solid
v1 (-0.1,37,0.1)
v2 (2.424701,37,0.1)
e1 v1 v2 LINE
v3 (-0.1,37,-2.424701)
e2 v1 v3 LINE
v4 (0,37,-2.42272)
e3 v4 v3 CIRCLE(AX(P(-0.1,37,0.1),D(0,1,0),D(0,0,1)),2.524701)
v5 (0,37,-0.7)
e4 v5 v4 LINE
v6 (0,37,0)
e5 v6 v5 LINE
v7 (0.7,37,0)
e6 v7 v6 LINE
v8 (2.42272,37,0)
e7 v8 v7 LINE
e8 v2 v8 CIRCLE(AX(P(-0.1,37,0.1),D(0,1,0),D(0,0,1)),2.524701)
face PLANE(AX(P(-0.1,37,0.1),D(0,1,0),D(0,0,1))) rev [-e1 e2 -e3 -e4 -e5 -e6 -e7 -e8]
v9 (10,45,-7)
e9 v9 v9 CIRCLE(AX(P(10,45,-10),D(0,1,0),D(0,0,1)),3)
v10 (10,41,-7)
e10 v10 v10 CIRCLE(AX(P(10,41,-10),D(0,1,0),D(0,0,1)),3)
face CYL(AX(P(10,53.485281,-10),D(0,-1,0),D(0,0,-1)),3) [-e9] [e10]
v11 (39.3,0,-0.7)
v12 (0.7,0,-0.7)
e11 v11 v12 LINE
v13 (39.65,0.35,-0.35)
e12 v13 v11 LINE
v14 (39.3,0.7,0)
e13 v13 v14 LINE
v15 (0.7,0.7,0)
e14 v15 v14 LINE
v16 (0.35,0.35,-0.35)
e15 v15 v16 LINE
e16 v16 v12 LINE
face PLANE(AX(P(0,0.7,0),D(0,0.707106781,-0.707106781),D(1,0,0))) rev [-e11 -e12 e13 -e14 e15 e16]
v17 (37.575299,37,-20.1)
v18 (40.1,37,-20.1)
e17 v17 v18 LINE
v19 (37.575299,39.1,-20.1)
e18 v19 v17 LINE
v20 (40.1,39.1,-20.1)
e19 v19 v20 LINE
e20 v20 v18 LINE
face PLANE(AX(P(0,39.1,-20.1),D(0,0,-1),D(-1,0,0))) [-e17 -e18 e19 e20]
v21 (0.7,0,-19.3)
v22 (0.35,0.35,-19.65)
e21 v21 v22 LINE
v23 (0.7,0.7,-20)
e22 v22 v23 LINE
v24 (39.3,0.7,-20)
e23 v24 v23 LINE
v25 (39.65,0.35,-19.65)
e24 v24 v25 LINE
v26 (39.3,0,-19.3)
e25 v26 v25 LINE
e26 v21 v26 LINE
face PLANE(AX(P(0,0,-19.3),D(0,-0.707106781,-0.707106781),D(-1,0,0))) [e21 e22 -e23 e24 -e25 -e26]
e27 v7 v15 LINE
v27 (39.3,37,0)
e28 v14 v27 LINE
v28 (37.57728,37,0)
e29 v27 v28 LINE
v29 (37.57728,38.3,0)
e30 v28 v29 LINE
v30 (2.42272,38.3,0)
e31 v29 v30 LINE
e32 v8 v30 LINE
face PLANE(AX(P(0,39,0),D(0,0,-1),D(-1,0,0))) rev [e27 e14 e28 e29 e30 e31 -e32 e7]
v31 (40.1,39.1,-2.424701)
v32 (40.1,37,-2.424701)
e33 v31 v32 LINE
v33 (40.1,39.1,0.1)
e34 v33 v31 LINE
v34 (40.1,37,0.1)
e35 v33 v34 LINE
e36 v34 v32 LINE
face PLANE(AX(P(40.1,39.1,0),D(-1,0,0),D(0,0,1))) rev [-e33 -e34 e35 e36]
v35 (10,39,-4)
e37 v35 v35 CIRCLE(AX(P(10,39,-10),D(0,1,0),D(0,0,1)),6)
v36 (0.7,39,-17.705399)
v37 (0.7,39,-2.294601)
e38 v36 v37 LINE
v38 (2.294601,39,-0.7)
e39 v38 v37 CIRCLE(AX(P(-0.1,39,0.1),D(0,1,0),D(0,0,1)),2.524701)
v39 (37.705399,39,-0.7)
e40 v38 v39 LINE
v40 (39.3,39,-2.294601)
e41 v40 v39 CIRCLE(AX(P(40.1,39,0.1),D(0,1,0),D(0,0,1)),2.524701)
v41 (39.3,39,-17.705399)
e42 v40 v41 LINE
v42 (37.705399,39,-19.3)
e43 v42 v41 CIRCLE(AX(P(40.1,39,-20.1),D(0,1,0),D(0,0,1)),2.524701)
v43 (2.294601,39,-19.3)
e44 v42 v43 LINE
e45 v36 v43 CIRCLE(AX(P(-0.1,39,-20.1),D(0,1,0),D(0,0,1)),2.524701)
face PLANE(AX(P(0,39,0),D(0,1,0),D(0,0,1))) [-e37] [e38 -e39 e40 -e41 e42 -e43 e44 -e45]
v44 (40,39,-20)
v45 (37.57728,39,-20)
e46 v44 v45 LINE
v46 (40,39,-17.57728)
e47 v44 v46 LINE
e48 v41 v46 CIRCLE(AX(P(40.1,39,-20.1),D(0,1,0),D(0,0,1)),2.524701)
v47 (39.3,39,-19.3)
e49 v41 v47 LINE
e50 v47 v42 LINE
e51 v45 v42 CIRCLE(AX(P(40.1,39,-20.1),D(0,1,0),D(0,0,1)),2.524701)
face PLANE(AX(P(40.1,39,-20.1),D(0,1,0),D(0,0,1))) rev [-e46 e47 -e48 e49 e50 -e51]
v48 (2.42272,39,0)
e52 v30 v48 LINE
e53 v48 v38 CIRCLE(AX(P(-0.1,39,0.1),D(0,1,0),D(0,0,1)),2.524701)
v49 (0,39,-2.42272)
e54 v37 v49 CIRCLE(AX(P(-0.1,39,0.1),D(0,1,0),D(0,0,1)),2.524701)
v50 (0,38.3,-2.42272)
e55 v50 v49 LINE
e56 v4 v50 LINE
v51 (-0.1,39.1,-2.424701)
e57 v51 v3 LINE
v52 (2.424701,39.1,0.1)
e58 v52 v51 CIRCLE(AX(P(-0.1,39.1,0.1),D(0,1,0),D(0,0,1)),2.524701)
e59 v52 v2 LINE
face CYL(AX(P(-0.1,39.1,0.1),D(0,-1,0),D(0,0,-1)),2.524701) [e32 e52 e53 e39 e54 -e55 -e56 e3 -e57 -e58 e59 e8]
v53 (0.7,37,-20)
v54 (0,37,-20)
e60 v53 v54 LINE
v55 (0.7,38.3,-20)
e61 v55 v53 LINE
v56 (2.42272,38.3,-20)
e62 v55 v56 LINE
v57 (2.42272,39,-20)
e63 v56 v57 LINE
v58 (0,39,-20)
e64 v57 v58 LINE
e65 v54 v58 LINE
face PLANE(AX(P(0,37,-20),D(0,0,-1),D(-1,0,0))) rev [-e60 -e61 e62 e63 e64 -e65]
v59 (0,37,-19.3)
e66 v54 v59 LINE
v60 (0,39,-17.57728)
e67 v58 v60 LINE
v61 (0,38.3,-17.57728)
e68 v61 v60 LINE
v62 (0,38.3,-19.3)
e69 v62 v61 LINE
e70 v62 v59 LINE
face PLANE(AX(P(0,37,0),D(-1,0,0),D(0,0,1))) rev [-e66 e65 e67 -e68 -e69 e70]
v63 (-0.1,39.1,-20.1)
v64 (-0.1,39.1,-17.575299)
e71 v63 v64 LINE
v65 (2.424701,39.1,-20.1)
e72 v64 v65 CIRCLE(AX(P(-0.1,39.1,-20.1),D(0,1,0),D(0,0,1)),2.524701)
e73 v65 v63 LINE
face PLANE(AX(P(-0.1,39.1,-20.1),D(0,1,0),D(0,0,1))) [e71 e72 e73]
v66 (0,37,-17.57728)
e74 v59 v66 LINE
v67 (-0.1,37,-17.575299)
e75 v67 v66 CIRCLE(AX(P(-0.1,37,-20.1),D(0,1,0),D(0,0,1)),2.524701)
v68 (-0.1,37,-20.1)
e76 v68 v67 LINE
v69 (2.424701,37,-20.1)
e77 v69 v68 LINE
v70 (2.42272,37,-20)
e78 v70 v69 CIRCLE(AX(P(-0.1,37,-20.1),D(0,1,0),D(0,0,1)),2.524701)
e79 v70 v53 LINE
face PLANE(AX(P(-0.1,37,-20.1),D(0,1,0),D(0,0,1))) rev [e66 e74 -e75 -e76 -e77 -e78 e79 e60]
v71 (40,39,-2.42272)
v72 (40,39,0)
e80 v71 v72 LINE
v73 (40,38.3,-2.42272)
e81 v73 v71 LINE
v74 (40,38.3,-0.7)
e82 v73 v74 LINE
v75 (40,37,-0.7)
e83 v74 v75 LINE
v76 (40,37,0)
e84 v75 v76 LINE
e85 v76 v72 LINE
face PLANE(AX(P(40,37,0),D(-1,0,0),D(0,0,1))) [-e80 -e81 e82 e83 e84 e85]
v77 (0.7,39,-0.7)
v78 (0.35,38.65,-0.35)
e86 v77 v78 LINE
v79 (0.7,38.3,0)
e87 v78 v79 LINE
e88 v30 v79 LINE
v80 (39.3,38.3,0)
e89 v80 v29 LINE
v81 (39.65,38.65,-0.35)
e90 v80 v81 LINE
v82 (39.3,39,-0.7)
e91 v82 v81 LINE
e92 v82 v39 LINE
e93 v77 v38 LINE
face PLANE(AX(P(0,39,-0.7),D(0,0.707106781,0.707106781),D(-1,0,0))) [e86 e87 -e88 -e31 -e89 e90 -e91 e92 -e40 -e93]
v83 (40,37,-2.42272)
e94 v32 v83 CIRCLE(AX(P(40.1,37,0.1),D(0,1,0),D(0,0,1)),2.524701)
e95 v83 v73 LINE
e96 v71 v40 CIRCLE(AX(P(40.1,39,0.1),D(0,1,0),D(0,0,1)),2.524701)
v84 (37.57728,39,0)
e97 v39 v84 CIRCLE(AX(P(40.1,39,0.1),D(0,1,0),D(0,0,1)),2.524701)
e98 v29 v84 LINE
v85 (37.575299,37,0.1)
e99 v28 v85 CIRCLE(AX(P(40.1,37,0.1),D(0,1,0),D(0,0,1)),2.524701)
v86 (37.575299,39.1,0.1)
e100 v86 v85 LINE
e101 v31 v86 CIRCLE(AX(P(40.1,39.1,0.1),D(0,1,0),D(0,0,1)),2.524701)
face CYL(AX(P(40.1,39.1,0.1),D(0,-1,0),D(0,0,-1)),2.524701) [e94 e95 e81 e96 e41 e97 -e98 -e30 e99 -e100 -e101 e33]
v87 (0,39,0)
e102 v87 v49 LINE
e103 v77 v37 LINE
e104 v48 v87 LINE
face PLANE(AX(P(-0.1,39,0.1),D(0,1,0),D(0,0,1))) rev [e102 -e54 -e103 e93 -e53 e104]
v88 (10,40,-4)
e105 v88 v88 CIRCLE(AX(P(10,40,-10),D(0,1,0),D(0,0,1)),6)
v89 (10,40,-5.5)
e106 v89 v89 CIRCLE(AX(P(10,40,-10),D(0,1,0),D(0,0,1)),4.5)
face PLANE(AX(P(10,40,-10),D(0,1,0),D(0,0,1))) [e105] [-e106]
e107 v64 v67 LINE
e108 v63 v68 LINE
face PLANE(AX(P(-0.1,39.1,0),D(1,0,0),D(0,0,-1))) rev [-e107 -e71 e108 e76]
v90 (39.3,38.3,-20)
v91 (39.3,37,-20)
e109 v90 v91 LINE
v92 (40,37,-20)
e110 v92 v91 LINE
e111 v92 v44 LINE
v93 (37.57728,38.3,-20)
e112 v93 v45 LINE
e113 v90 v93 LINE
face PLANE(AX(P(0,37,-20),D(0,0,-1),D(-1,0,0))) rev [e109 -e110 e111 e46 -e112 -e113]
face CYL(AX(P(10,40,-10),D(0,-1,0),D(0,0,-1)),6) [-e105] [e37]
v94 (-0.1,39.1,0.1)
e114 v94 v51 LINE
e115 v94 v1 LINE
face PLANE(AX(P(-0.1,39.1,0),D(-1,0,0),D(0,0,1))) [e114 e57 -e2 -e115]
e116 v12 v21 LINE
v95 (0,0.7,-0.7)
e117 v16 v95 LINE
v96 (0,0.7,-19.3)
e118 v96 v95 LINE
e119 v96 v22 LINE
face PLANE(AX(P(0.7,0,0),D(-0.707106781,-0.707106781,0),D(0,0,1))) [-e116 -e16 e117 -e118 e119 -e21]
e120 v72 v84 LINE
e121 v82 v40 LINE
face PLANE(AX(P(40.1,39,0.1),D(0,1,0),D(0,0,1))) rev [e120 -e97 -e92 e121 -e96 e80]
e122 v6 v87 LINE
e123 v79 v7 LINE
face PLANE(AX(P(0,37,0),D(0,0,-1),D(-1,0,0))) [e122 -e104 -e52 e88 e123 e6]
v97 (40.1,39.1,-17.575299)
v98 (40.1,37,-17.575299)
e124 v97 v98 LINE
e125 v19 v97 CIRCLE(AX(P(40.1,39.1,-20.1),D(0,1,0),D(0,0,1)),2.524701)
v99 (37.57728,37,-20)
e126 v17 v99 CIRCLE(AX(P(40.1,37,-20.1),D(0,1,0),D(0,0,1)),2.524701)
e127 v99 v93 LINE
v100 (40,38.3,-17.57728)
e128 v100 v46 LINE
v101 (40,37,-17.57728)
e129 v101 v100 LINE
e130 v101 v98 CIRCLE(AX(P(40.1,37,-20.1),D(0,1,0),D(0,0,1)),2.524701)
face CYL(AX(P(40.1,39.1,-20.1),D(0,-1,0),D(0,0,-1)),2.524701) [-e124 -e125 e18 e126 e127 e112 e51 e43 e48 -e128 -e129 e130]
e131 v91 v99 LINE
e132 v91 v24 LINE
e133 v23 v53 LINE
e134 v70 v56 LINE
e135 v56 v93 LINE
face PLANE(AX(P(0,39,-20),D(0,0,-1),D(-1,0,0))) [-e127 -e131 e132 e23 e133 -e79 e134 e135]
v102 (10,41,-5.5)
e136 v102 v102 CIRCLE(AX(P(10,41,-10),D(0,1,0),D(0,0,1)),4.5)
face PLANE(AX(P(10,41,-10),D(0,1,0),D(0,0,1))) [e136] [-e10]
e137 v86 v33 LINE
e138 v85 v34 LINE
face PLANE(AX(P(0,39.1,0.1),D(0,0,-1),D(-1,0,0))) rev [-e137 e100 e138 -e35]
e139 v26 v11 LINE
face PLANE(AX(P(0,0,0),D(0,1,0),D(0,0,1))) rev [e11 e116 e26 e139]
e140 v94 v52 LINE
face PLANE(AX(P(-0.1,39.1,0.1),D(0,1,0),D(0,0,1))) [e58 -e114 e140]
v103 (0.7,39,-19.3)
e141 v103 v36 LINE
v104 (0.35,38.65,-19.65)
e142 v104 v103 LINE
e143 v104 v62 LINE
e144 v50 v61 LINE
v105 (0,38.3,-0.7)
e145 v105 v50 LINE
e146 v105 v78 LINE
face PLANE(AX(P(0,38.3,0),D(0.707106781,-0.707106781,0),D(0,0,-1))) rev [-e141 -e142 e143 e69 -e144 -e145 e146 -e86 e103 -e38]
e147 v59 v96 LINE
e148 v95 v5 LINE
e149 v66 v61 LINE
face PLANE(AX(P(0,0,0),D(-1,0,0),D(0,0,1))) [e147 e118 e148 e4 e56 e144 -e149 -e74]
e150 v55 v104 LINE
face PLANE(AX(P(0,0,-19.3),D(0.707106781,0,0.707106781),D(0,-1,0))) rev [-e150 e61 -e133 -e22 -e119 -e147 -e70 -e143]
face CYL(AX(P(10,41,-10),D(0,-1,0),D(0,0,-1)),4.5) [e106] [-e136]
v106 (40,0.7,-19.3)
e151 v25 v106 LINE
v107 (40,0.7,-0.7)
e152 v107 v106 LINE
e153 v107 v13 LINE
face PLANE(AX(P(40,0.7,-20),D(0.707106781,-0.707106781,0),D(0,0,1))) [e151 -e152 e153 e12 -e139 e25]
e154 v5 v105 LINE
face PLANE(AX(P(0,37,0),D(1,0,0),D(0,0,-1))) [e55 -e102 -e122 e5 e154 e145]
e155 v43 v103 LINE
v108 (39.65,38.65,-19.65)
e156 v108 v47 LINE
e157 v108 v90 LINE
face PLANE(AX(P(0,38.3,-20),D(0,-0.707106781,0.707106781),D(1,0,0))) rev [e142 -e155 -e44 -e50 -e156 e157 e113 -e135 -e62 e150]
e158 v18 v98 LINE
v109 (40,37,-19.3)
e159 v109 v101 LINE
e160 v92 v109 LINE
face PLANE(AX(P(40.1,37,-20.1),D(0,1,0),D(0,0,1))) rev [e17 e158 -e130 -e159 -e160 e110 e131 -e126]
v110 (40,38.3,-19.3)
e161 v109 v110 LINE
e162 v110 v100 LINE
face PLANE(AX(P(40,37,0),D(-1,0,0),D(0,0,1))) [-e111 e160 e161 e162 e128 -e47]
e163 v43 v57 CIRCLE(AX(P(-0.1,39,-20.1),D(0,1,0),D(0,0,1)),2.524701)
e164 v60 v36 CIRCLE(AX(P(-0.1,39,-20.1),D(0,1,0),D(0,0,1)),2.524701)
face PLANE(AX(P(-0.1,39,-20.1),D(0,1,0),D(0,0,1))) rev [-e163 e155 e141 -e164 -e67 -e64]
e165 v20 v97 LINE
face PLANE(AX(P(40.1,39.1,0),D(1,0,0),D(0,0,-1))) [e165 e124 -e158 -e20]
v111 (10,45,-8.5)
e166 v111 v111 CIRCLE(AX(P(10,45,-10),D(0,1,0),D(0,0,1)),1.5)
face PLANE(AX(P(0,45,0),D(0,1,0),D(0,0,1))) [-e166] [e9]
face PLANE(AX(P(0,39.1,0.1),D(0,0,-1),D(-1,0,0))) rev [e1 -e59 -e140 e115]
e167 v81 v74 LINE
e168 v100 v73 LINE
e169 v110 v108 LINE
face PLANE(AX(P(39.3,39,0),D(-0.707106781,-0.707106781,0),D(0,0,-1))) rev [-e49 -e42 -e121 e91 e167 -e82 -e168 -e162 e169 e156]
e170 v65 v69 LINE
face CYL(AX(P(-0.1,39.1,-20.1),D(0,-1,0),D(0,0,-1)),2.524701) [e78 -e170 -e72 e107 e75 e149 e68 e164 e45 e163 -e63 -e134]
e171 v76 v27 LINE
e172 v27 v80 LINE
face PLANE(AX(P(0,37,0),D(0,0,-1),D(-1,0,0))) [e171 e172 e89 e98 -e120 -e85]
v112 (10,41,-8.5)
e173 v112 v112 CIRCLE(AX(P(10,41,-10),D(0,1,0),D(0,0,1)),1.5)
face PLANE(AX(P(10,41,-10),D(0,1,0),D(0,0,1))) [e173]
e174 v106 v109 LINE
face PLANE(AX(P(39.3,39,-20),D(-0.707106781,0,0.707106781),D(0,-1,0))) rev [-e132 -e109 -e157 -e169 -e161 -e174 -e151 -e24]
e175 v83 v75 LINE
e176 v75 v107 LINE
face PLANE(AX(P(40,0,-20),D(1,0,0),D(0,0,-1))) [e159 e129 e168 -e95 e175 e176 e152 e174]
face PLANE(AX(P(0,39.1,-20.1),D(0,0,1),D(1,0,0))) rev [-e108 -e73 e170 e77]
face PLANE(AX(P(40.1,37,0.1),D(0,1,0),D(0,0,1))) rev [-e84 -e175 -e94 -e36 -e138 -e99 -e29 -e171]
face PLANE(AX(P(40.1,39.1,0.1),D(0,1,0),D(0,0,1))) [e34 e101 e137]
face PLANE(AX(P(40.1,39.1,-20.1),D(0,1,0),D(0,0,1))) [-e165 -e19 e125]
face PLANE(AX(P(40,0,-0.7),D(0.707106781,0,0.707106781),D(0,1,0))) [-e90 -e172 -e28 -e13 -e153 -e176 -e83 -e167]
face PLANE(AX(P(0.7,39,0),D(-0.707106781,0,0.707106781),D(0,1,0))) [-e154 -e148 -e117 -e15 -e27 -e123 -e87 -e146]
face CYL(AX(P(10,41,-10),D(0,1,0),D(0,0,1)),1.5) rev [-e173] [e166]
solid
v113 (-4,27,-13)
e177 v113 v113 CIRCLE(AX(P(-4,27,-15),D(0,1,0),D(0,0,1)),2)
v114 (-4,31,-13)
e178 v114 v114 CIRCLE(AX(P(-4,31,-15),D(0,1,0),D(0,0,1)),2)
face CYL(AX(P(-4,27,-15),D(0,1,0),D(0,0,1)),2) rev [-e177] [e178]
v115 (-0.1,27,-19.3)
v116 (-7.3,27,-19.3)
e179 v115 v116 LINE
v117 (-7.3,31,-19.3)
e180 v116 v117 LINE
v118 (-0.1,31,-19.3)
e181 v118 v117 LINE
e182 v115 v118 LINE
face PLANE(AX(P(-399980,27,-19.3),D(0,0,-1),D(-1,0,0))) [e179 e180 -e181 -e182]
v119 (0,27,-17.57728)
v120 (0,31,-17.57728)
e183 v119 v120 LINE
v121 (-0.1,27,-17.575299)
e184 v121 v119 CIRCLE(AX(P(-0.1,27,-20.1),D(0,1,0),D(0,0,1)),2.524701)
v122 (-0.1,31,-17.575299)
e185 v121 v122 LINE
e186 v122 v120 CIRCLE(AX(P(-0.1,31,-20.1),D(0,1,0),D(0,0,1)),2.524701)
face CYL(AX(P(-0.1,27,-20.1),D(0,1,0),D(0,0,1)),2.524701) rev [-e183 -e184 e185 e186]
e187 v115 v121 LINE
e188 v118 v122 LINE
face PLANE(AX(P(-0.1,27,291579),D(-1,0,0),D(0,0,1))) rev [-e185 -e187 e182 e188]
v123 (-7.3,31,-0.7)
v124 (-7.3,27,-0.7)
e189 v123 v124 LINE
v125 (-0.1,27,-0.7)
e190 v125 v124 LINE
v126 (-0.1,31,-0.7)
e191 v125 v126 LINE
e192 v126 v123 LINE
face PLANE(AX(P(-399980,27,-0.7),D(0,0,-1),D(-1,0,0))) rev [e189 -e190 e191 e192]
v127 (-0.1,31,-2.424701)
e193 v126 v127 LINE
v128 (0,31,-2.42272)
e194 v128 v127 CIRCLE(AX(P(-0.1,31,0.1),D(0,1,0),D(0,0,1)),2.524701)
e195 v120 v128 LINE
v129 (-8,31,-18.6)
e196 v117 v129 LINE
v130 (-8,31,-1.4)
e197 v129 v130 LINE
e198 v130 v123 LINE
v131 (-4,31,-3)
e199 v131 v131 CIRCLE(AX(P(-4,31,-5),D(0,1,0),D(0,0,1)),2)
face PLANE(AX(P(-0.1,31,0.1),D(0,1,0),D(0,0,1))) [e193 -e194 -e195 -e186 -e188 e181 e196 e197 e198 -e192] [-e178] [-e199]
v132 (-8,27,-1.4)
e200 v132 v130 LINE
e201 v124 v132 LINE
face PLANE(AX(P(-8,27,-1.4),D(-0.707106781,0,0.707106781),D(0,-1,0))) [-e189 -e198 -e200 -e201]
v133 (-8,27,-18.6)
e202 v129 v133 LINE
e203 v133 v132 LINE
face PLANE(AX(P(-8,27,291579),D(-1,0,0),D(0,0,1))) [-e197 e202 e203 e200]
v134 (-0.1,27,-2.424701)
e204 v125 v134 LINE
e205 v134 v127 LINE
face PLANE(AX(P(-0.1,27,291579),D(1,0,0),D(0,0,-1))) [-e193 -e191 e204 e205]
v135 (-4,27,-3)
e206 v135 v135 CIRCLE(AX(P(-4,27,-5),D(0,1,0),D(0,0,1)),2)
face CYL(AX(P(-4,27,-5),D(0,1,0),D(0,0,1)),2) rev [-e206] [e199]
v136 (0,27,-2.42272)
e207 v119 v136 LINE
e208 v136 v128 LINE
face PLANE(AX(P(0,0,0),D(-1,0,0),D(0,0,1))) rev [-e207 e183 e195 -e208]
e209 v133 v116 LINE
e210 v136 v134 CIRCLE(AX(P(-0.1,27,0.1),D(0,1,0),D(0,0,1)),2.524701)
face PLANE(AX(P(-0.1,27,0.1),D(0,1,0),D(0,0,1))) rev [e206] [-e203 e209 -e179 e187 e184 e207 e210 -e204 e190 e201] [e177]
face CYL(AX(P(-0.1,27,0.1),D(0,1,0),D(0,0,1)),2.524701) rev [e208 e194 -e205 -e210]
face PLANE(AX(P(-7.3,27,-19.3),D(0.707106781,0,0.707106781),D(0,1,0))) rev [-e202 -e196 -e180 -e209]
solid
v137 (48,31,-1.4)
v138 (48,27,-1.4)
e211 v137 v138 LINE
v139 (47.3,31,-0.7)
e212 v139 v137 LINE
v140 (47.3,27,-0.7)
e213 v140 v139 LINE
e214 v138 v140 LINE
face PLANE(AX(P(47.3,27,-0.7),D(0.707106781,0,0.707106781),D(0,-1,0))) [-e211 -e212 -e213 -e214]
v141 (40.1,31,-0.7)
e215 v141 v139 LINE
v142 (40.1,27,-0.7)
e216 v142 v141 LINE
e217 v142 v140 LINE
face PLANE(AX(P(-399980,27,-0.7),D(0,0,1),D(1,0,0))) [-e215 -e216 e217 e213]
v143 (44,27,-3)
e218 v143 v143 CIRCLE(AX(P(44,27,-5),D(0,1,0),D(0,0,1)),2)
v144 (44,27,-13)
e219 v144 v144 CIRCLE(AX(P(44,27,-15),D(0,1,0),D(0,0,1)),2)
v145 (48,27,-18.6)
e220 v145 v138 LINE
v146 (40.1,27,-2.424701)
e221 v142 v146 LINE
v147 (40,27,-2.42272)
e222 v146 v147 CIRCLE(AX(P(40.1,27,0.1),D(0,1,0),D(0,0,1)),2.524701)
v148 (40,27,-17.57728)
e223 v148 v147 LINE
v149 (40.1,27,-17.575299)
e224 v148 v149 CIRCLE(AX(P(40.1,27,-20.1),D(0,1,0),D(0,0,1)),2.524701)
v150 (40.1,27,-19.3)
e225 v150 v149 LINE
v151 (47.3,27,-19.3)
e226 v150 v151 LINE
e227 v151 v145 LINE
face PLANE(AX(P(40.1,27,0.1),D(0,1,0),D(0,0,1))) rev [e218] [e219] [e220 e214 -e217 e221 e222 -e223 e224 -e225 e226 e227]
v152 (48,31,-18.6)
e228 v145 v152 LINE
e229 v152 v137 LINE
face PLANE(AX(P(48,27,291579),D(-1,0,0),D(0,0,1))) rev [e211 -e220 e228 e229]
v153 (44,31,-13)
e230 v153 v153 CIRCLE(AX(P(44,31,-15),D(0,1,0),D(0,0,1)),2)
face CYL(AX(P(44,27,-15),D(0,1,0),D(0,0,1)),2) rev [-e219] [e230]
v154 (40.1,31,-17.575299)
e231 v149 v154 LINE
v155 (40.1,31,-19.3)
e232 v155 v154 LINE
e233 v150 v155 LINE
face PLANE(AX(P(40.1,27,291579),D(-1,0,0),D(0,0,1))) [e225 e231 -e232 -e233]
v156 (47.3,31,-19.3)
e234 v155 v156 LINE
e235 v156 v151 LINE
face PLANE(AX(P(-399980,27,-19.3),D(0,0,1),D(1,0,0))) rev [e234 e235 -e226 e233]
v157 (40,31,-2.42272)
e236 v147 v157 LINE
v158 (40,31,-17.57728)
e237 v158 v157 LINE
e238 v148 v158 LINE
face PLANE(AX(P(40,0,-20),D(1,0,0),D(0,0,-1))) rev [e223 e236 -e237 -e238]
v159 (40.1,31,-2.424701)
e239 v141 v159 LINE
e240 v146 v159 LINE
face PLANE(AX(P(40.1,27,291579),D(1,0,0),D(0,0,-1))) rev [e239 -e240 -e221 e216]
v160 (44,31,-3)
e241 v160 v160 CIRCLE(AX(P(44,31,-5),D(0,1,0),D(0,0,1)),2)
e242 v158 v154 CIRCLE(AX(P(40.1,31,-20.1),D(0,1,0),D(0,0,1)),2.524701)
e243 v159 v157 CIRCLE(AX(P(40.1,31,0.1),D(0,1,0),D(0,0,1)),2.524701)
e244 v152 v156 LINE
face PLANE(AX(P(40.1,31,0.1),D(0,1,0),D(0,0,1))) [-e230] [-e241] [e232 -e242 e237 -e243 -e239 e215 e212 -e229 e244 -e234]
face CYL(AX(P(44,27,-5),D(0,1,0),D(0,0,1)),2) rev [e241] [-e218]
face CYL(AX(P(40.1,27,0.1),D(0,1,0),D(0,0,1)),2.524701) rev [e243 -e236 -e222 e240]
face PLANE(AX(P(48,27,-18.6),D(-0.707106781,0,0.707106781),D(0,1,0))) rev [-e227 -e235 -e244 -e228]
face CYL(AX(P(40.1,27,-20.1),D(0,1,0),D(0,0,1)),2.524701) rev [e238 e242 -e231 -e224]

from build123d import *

# Parameters (mm, degrees)
SKETCH_1_W                   = 40
SKETCH_1_H                   = 20
EXTRUDE_1_DEPTH              = 39
EXTRUDE_START                = 31
SKETCH_1_6_R                 = 2
EXTRUDE_2_DEPTH              = 4
EXTRUDE_START_2              = 39
SKETCH_1_9_R                 = 3
EXTRUDE_3_DEPTH              = 6
SKETCH_1_10_R                = 6
EXTRUDE_4_DEPTH              = 1
EXTRUDE_START_3              = 40
SKETCH_1_13_R                = 4.5
EXTRUDE_5_DEPTH              = 1
CUT_EXTRUDE_START            = 45
SKETCH_1_16_R                = 1.5
CUT_EXTRUDE_1_DEPTH          = 4
SPLIT_BODIES_1_OUTLINE_W     = 40
SPLIT_BODIES_1_OUTLINE_H     = 20
SPLIT_BODIES_1_DEPTH         = 39
SPLIT_START                  = 39
SPLIT_BODIES_1_2_OUTLINE_R   = 4.5
SPLIT_BODIES_1_2_DEPTH       = 2
SPLIT_START_2                = 41
SPLIT_BODIES_1_3_OUTLINE_R   = 3
SPLIT_BODIES_1_3_OUTLINE_R_2 = 1.5
SPLIT_BODIES_1_3_DEPTH       = 4
SPLIT_BODIES_1_4_OUTLINE_R   = 6
SPLIT_BODIES_1_4_OUTLINE_R_2 = 4.5
SPLIT_BODIES_1_4_DEPTH       = 1
SPLIT_BODIES_1_5_OUTLINE_W   = 46
SPLIT_BODIES_1_5_OUTLINE_H   = 22
SPLIT_BODIES_1_5_DEPTH       = 48
SPLIT_START_3                = 27
SPLIT_BODIES_1_6_OUTLINE_R   = 2
SPLIT_BODIES_1_6_DEPTH       = 4
CHAMFER_9_SIZE               = 0.7
CHAMFER_10_SIZE              = 0.7
CHAMFER_11_SIZE              = 0.7
CHAMFER_12_SIZE              = 0.7
EXTRUDE_START_4              = 39.1
EXTRUDE_6_DEPTH              = 0.1
EXTRUDE_7_DEPTH              = 2


# Read off the part's stored shape, not the designer's step: 分割1
with BuildPart() as part:
    # 草图1 → 凸台-拉伸1 (new body)
    with BuildSketch(Plane(origin=(0, 0, 0), x_dir=(1, 0, 0), z_dir=(0, 1, 0))):
        with Locations((20, 10)):
            Rectangle(SKETCH_1_W, SKETCH_1_H)
    extrude(amount=EXTRUDE_1_DEPTH)

    # 草图1<6> → 凸台-拉伸2 (add)
    # profile 1 of 2: a face of its own
    with BuildSketch(Plane(origin=(0, 0, 0), x_dir=(1, 0, 0), z_dir=(0, 1, 0)).offset(EXTRUDE_START)):
        with BuildLine():
            ThreePointArc((-0.1, 2.424701022), (-0.049990188, 2.424205671), (0, 2.422719812))
            Line((0, 2.422719812), (0, 17.577280188))
            ThreePointArc((0, 17.577280188), (-0.049990188, 17.575794329), (-0.1, 17.575298978))
            Line((-0.1, 17.575298978), (-0.1, 19.3))
            Line((-0.1, 19.3), (-8, 19.3))
            Line((-8, 19.3), (-8, 0.7))
            Line((-8, 0.7), (-0.1, 0.7))
            Line((-0.1, 0.7), (-0.1, 2.424701022))
        make_face()
        with Locations(Location((-4, 5, 0), (0, 0, 270))):
            Circle(SKETCH_1_6_R, mode=Mode.SUBTRACT)
        with Locations(Location((-4, 15, 0), (0, 0, 270))):
            Circle(SKETCH_1_6_R, mode=Mode.SUBTRACT)
    # profile 2 of 2: a face of its own
    with BuildSketch(Plane(origin=(0, 0, 0), x_dir=(1, 0, 0), z_dir=(0, 1, 0)).offset(EXTRUDE_START)):
        with BuildLine():
            Line((40, 17.577280188), (40, 2.422719812))
            ThreePointArc((40, 2.422719812), (40.049990188, 2.424205671), (40.1, 2.424701022))
            Line((40.1, 2.424701022), (40.1, 0.7))
            Line((40.1, 0.7), (48, 0.7))
            Line((48, 0.7), (48, 19.3))
            Line((48, 19.3), (40.1, 19.3))
            Line((40.1, 19.3), (40.1, 17.575298978))
            ThreePointArc((40.1, 17.575298978), (40.049990188, 17.575794329), (40, 17.577280188))
        make_face()
        with Locations(Location((44, 5, 0), (0, 0, 270))):
            Circle(SKETCH_1_6_R, mode=Mode.SUBTRACT)
        with Locations(Location((44, 15, 0), (0, 0, 270))):
            Circle(SKETCH_1_6_R, mode=Mode.SUBTRACT)
    extrude(amount=-EXTRUDE_2_DEPTH)

    # 草图1<9> → 凸台-拉伸3 (add)
    with BuildSketch(Plane(origin=(0, 0, 0), x_dir=(1, 0, 0), z_dir=(0, 1, 0)).offset(EXTRUDE_START_2)):
        with Locations(Location((10, 10, 0), (0, 0, 270))):
            Circle(SKETCH_1_9_R)
    extrude(amount=EXTRUDE_3_DEPTH)

    # 草图1<10> → 凸台-拉伸4 (add)
    with BuildSketch(Plane(origin=(0, 0, 0), x_dir=(1, 0, 0), z_dir=(0, 1, 0)).offset(EXTRUDE_START_2)):
        with Locations(Location((10, 10, 0), (0, 0, 270))):
            Circle(SKETCH_1_10_R)
    extrude(amount=EXTRUDE_4_DEPTH)

    # 草图1<13> → 凸台-拉伸5 (add)
    with BuildSketch(Plane(origin=(0, 0, 0), x_dir=(1, 0, 0), z_dir=(0, 1, 0)).offset(EXTRUDE_START_3)):
        with Locations(Location((10, 10, 0), (0, 0, 270))):
            Circle(SKETCH_1_13_R)
    extrude(amount=EXTRUDE_5_DEPTH)

    # 草图1<16> → 切除-拉伸1 (cut)
    with BuildSketch(Plane(origin=(0, 0, 0), x_dir=(1, 0, 0), z_dir=(0, 1, 0)).offset(CUT_EXTRUDE_START)):
        with Locations(Location((10, 10, 0), (0, 0, 270))):
            Circle(SKETCH_1_16_R)
    extrude(amount=-CUT_EXTRUDE_1_DEPTH, mode=Mode.SUBTRACT)

    # Split Bodies 1 5 outline → Split Bodies 1 5 (cut)
    with BuildSketch(Plane.YZ):
        with Locations((22, -10)):
            Rectangle(SPLIT_BODIES_1_5_OUTLINE_W, SPLIT_BODIES_1_5_OUTLINE_H)
    extrude(amount=SPLIT_BODIES_1_5_DEPTH, mode=Mode.SUBTRACT)

    # 倒角10
    chamfer_10_edges = [part.edges().sort_by_distance(p)[0] for p in [
        (-8, 29, -19.3),
        (-8, 29, -0.7),
    ]]
    chamfer(chamfer_10_edges, length=CHAMFER_10_SIZE)


with BuildPart() as body_2:
    # Split Bodies 1 outline → Split Bodies 1 (new body)
    with BuildSketch(Plane(origin=(0, 0, 0), x_dir=(1, 0, 0), z_dir=(0, 1, 0))):
        with Locations((20, 10)):
            Rectangle(SPLIT_BODIES_1_OUTLINE_W, SPLIT_BODIES_1_OUTLINE_H)
    extrude(amount=SPLIT_BODIES_1_DEPTH)

    # Split Bodies 1 2 outline → Split Bodies 1 2 (add)
    with BuildSketch(Plane(origin=(0, 0, 0), x_dir=(1, 0, 0), z_dir=(0, 1, 0)).offset(SPLIT_START)):
        with Locations((10, 10)):
            Circle(SPLIT_BODIES_1_2_OUTLINE_R)
    extrude(amount=SPLIT_BODIES_1_2_DEPTH)

    # Split Bodies 1 3 outline → Split Bodies 1 3 (add)
    with BuildSketch(Plane(origin=(0, 0, 0), x_dir=(1, 0, 0), z_dir=(0, 1, 0)).offset(SPLIT_START_2)):
        with Locations((10, 10)):
            Circle(SPLIT_BODIES_1_3_OUTLINE_R)
        with Locations((10, 10)):
            Circle(SPLIT_BODIES_1_3_OUTLINE_R_2, mode=Mode.SUBTRACT)
    extrude(amount=SPLIT_BODIES_1_3_DEPTH)

    # Split Bodies 1 4 outline → Split Bodies 1 4 (add)
    with BuildSketch(Plane(origin=(0, 0, 0), x_dir=(1, 0, 0), z_dir=(0, 1, 0)).offset(SPLIT_START)):
        with Locations((10, 10)):
            Circle(SPLIT_BODIES_1_4_OUTLINE_R)
        with Locations((10, 10)):
            Circle(SPLIT_BODIES_1_4_OUTLINE_R_2, mode=Mode.SUBTRACT)
    extrude(amount=SPLIT_BODIES_1_4_DEPTH)

    # 倒角9
    chamfer_9_edges = [body_2.edges().sort_by_distance(p)[0] for p in [
        (20, 0, 0),
        (40, 0, -10),
        (20, 0, -20),
        (0, 0, -10),
        (20, 39, 0),
        (40, 39, -10),
        (20, 39, -20),
        (0, 39, -10),
    ]]
    chamfer(chamfer_9_edges, length=CHAMFER_9_SIZE)

    # 倒角12
    chamfer_12_edges = [body_2.edges().sort_by_distance(p)[0] for p in [
        (40, 19.5, -20),
        (40, 19.5, 0),
        (0, 19.5, 0),
        (0, 19.5, -20),
    ]]
    chamfer(chamfer_12_edges, length=CHAMFER_12_SIZE)

    # 草图1<26> → 凸台-拉伸6 (add)
    with BuildSketch(Plane(origin=(0, 0, 0), x_dir=(1, 0, 0), z_dir=(0, 1, 0)).offset(EXTRUDE_START_4)):
        Polygon((0, -0.1), (0, 0), (0, 0.7), (-0.1, 0.7), (-0.1, -0.1), align=None)
        with BuildLine():
            Line((0, 0.7), (0, 0))
            Line((0, 0), (2.422719812, 0))
            ThreePointArc((2.422719812, 0), (2.349175143, 0.512908125), (2.172468976, 1))
            Line((2.172468976, 1), (1, 1))
            Line((1, 1), (1, 2.172468976))
            ThreePointArc((1, 2.172468976), (0.512908125, 2.349175143), (0, 2.422719812))
            Line((0, 2.422719812), (0, 0.7))
        make_face()
        with BuildLine():
            Line((2.422719812, 0), (0, 0))
            Line((0, 0), (0, -0.1))
            Line((0, -0.1), (2.424701022, -0.1))
            ThreePointArc((2.424701022, -0.1), (2.424205671, -0.049990188), (2.422719812, 0))
        make_face()
        with BuildLine():
            Line((-0.1, 0.7), (0, 0.7))
            Line((0, 0.7), (0, 2.422719812))
            ThreePointArc((0, 2.422719812), (-0.049990188, 2.424205671), (-0.1, 2.424701022))
            Line((-0.1, 2.424701022), (-0.1, 0.7))
        make_face()
        with BuildLine():
            ThreePointArc((37.827531024, 1), (37.650824857, 0.512908125), (37.577280188, 0))
            Line((37.577280188, 0), (40, 0))
            Line((40, 0), (40, 0.7))
            Line((40, 0.7), (40, 2.422719812))
            ThreePointArc((40, 2.422719812), (39.487091875, 2.349175143), (39, 2.172468976))
            Line((39, 2.172468976), (39, 1))
            Line((39, 1), (37.827531024, 1))
        make_face()
        with BuildLine():
            Line((40, 0), (37.577280188, 0))
            ThreePointArc((37.577280188, 0), (37.575794329, -0.049990188), (37.575298978, -0.1))
            Line((37.575298978, -0.1), (40, -0.1))
            Line((40, -0.1), (40.1, -0.1))
            Line((40.1, -0.1), (40.1, 0.7))
            Line((40.1, 0.7), (40, 0.7))
            Line((40, 0.7), (40, 0))
        make_face()
        with BuildLine():
            Line((40, 2.422719812), (40, 0.7))
            Line((40, 0.7), (40.1, 0.7))
            Line((40.1, 0.7), (40.1, 2.424701022))
            ThreePointArc((40.1, 2.424701022), (40.049990188, 2.424205671), (40, 2.422719812))
        make_face()
        with BuildLine():
            ThreePointArc((-0.1, 17.575298978), (-0.049990188, 17.575794329), (0, 17.577280188))
            Line((0, 17.577280188), (0, 19.3))
            Line((0, 19.3), (-0.1, 19.3))
            Line((-0.1, 19.3), (-0.1, 17.575298978))
        make_face()
        with BuildLine():
            Line((-0.1, 19.3), (0, 19.3))
            Line((0, 19.3), (0, 20))
            Line((0, 20), (2.422719812, 20))
            ThreePointArc((2.422719812, 20), (2.424205671, 20.049990188), (2.424701022, 20.1))
            Line((2.424701022, 20.1), (0, 20.1))
            Line((0, 20.1), (-0.1, 20.1))
            Line((-0.1, 20.1), (-0.1, 19.3))
        make_face()
        with BuildLine():
            Line((0, 19.3), (0, 17.577280188))
            ThreePointArc((0, 17.577280188), (0.512908125, 17.650824857), (1, 17.827531024))
            Line((1, 17.827531024), (1, 19))
            Line((1, 19), (2.172468976, 19))
            ThreePointArc((2.172468976, 19), (2.349175143, 19.487091875), (2.422719812, 20))
            Line((2.422719812, 20), (0, 20))
            Line((0, 20), (0, 19.3))
        make_face()
        with BuildLine():
            Line((39, 19), (39, 17.827531024))
            ThreePointArc((39, 17.827531024), (39.487091875, 17.650824857), (40, 17.577280188))
            Line((40, 17.577280188), (40, 19.3))
            Line((40, 19.3), (40, 20))
            Line((40, 20), (37.577280188, 20))
            ThreePointArc((37.577280188, 20), (37.650824857, 19.487091875), (37.827531024, 19))
            Line((37.827531024, 19), (39, 19))
        make_face()
        with BuildLine():
            Line((40, 20), (40, 19.3))
            Line((40, 19.3), (40.1, 19.3))
            Line((40.1, 19.3), (40.1, 20.1))
            Line((40.1, 20.1), (40, 20.1))
            Line((40, 20.1), (37.575298978, 20.1))
            ThreePointArc((37.575298978, 20.1), (37.575794329, 20.049990188), (37.577280188, 20))
            Line((37.577280188, 20), (40, 20))
        make_face()
        with BuildLine():
            Line((40, 19.3), (40, 17.577280188))
            ThreePointArc((40, 17.577280188), (40.049990188, 17.575794329), (40.1, 17.575298978))
            Line((40.1, 17.575298978), (40.1, 19.3))
            Line((40.1, 19.3), (40, 19.3))
        make_face()
        with BuildLine():
            Line((1, 1), (2.172468976, 1))
            ThreePointArc((2.172468976, 1), (1.685233213, 1.685233213), (1, 2.172468976))
            Line((1, 2.172468976), (1, 1))
        make_face()
        with BuildLine():
            Line((1, 19), (1, 17.827531024))
            ThreePointArc((1, 17.827531024), (1.685233213, 18.314766787), (2.172468976, 19))
            Line((2.172468976, 19), (1, 19))
        make_face()
        with BuildLine():
            ThreePointArc((37.827531024, 19), (38.314766787, 18.314766787), (39, 17.827531024))
            Line((39, 17.827531024), (39, 19))
            Line((39, 19), (37.827531024, 19))
        make_face()
        with BuildLine():
            ThreePointArc((39, 2.172468976), (38.314766787, 1.685233213), (37.827531024, 1))
            Line((37.827531024, 1), (39, 1))
            Line((39, 1), (39, 2.172468976))
        make_face()
    extrude(amount=-EXTRUDE_6_DEPTH)

    # 草图1<27> → 凸台-拉伸7 (add)
    with BuildSketch(Plane(origin=(0, 0, 0), x_dir=(1, 0, 0), z_dir=(0, 1, 0)).offset(EXTRUDE_START_2)):
        with BuildLine():
            Line((-0.1, 19.3), (0, 19.3))
            Line((0, 19.3), (0, 20))
            Line((0, 20), (2.422719812, 20))
            ThreePointArc((2.422719812, 20), (2.424205671, 20.049990188), (2.424701022, 20.1))
            Line((2.424701022, 20.1), (0, 20.1))
            Line((0, 20.1), (-0.1, 20.1))
            Line((-0.1, 20.1), (-0.1, 19.3))
        make_face()
        with BuildLine():
            ThreePointArc((-0.1, 17.575298978), (-0.049990188, 17.575794329), (0, 17.577280188))
            Line((0, 17.577280188), (0, 19.3))
            Line((0, 19.3), (-0.1, 19.3))
            Line((-0.1, 19.3), (-0.1, 17.575298978))
        make_face()
        Polygon((0, -0.1), (0, 0), (0, 0.7), (-0.1, 0.7), (-0.1, -0.1), align=None)
        with BuildLine():
            Line((-0.1, 0.7), (0, 0.7))
            Line((0, 0.7), (0, 2.422719812))
            ThreePointArc((0, 2.422719812), (-0.049990188, 2.424205671), (-0.1, 2.424701022))
            Line((-0.1, 2.424701022), (-0.1, 0.7))
        make_face()
        with BuildLine():
            Line((2.422719812, 0), (0, 0))
            Line((0, 0), (0, -0.1))
            Line((0, -0.1), (2.424701022, -0.1))
            ThreePointArc((2.424701022, -0.1), (2.424205671, -0.049990188), (2.422719812, 0))
        make_face()
        with BuildLine():
            Line((40, 0), (37.577280188, 0))
            ThreePointArc((37.577280188, 0), (37.575794329, -0.049990188), (37.575298978, -0.1))
            Line((37.575298978, -0.1), (40, -0.1))
            Line((40, -0.1), (40.1, -0.1))
            Line((40.1, -0.1), (40.1, 0.7))
            Line((40.1, 0.7), (40, 0.7))
            Line((40, 0.7), (40, 0))
        make_face()
        with BuildLine():
            Line((40, 2.422719812), (40, 0.7))
            Line((40, 0.7), (40.1, 0.7))
            Line((40.1, 0.7), (40.1, 2.424701022))
            ThreePointArc((40.1, 2.424701022), (40.049990188, 2.424205671), (40, 2.422719812))
        make_face()
        with BuildLine():
            Line((40, 19.3), (40, 17.577280188))
            ThreePointArc((40, 17.577280188), (40.049990188, 17.575794329), (40.1, 17.575298978))
            Line((40.1, 17.575298978), (40.1, 19.3))
            Line((40.1, 19.3), (40, 19.3))
        make_face()
        with BuildLine():
            Line((40, 20), (40, 19.3))
            Line((40, 19.3), (40.1, 19.3))
            Line((40.1, 19.3), (40.1, 20.1))
            Line((40.1, 20.1), (40, 20.1))
            Line((40, 20.1), (37.575298978, 20.1))
            ThreePointArc((37.575298978, 20.1), (37.575794329, 20.049990188), (37.577280188, 20))
            Line((37.577280188, 20), (40, 20))
        make_face()
    extrude(amount=-EXTRUDE_7_DEPTH)


with BuildPart() as body_3:
    # Split Bodies 1 6 outline → Split Bodies 1 6 (new body)
    with BuildSketch(Plane(origin=(0, 0, 0), x_dir=(1, 0, 0), z_dir=(0, 1, 0)).offset(SPLIT_START_3)):
        with BuildLine():
            Line((40, 17.577280188), (40, 2.422719812))
            ThreePointArc((40, 2.422719812), (40.049990188, 2.424205671), (40.1, 2.424701022))
            Line((40.1, 2.424701022), (40.1, 0.7))
            Line((40.1, 0.7), (48, 0.7))
            Line((48, 0.7), (48, 19.3))
            Line((48, 19.3), (40.1, 19.3))
            Line((40.1, 19.3), (40.1, 17.575298978))
            ThreePointArc((40.1, 17.575298978), (40.049990188, 17.575794329), (40, 17.577280188))
        make_face()
        with Locations((44, 5)):
            Circle(SPLIT_BODIES_1_6_OUTLINE_R, mode=Mode.SUBTRACT)
        with Locations((44, 15)):
            Circle(SPLIT_BODIES_1_6_OUTLINE_R, mode=Mode.SUBTRACT)
    extrude(amount=SPLIT_BODIES_1_6_DEPTH)

    # 倒角11
    chamfer_11_edges = [body_3.edges().sort_by_distance(p)[0] for p in [
        (48, 29, -19.3),
        (48, 29, -0.7),
    ]]
    chamfer(chamfer_11_edges, length=CHAMFER_11_SIZE)


solid = Compound([part.part, body_2.part, body_3.part])
